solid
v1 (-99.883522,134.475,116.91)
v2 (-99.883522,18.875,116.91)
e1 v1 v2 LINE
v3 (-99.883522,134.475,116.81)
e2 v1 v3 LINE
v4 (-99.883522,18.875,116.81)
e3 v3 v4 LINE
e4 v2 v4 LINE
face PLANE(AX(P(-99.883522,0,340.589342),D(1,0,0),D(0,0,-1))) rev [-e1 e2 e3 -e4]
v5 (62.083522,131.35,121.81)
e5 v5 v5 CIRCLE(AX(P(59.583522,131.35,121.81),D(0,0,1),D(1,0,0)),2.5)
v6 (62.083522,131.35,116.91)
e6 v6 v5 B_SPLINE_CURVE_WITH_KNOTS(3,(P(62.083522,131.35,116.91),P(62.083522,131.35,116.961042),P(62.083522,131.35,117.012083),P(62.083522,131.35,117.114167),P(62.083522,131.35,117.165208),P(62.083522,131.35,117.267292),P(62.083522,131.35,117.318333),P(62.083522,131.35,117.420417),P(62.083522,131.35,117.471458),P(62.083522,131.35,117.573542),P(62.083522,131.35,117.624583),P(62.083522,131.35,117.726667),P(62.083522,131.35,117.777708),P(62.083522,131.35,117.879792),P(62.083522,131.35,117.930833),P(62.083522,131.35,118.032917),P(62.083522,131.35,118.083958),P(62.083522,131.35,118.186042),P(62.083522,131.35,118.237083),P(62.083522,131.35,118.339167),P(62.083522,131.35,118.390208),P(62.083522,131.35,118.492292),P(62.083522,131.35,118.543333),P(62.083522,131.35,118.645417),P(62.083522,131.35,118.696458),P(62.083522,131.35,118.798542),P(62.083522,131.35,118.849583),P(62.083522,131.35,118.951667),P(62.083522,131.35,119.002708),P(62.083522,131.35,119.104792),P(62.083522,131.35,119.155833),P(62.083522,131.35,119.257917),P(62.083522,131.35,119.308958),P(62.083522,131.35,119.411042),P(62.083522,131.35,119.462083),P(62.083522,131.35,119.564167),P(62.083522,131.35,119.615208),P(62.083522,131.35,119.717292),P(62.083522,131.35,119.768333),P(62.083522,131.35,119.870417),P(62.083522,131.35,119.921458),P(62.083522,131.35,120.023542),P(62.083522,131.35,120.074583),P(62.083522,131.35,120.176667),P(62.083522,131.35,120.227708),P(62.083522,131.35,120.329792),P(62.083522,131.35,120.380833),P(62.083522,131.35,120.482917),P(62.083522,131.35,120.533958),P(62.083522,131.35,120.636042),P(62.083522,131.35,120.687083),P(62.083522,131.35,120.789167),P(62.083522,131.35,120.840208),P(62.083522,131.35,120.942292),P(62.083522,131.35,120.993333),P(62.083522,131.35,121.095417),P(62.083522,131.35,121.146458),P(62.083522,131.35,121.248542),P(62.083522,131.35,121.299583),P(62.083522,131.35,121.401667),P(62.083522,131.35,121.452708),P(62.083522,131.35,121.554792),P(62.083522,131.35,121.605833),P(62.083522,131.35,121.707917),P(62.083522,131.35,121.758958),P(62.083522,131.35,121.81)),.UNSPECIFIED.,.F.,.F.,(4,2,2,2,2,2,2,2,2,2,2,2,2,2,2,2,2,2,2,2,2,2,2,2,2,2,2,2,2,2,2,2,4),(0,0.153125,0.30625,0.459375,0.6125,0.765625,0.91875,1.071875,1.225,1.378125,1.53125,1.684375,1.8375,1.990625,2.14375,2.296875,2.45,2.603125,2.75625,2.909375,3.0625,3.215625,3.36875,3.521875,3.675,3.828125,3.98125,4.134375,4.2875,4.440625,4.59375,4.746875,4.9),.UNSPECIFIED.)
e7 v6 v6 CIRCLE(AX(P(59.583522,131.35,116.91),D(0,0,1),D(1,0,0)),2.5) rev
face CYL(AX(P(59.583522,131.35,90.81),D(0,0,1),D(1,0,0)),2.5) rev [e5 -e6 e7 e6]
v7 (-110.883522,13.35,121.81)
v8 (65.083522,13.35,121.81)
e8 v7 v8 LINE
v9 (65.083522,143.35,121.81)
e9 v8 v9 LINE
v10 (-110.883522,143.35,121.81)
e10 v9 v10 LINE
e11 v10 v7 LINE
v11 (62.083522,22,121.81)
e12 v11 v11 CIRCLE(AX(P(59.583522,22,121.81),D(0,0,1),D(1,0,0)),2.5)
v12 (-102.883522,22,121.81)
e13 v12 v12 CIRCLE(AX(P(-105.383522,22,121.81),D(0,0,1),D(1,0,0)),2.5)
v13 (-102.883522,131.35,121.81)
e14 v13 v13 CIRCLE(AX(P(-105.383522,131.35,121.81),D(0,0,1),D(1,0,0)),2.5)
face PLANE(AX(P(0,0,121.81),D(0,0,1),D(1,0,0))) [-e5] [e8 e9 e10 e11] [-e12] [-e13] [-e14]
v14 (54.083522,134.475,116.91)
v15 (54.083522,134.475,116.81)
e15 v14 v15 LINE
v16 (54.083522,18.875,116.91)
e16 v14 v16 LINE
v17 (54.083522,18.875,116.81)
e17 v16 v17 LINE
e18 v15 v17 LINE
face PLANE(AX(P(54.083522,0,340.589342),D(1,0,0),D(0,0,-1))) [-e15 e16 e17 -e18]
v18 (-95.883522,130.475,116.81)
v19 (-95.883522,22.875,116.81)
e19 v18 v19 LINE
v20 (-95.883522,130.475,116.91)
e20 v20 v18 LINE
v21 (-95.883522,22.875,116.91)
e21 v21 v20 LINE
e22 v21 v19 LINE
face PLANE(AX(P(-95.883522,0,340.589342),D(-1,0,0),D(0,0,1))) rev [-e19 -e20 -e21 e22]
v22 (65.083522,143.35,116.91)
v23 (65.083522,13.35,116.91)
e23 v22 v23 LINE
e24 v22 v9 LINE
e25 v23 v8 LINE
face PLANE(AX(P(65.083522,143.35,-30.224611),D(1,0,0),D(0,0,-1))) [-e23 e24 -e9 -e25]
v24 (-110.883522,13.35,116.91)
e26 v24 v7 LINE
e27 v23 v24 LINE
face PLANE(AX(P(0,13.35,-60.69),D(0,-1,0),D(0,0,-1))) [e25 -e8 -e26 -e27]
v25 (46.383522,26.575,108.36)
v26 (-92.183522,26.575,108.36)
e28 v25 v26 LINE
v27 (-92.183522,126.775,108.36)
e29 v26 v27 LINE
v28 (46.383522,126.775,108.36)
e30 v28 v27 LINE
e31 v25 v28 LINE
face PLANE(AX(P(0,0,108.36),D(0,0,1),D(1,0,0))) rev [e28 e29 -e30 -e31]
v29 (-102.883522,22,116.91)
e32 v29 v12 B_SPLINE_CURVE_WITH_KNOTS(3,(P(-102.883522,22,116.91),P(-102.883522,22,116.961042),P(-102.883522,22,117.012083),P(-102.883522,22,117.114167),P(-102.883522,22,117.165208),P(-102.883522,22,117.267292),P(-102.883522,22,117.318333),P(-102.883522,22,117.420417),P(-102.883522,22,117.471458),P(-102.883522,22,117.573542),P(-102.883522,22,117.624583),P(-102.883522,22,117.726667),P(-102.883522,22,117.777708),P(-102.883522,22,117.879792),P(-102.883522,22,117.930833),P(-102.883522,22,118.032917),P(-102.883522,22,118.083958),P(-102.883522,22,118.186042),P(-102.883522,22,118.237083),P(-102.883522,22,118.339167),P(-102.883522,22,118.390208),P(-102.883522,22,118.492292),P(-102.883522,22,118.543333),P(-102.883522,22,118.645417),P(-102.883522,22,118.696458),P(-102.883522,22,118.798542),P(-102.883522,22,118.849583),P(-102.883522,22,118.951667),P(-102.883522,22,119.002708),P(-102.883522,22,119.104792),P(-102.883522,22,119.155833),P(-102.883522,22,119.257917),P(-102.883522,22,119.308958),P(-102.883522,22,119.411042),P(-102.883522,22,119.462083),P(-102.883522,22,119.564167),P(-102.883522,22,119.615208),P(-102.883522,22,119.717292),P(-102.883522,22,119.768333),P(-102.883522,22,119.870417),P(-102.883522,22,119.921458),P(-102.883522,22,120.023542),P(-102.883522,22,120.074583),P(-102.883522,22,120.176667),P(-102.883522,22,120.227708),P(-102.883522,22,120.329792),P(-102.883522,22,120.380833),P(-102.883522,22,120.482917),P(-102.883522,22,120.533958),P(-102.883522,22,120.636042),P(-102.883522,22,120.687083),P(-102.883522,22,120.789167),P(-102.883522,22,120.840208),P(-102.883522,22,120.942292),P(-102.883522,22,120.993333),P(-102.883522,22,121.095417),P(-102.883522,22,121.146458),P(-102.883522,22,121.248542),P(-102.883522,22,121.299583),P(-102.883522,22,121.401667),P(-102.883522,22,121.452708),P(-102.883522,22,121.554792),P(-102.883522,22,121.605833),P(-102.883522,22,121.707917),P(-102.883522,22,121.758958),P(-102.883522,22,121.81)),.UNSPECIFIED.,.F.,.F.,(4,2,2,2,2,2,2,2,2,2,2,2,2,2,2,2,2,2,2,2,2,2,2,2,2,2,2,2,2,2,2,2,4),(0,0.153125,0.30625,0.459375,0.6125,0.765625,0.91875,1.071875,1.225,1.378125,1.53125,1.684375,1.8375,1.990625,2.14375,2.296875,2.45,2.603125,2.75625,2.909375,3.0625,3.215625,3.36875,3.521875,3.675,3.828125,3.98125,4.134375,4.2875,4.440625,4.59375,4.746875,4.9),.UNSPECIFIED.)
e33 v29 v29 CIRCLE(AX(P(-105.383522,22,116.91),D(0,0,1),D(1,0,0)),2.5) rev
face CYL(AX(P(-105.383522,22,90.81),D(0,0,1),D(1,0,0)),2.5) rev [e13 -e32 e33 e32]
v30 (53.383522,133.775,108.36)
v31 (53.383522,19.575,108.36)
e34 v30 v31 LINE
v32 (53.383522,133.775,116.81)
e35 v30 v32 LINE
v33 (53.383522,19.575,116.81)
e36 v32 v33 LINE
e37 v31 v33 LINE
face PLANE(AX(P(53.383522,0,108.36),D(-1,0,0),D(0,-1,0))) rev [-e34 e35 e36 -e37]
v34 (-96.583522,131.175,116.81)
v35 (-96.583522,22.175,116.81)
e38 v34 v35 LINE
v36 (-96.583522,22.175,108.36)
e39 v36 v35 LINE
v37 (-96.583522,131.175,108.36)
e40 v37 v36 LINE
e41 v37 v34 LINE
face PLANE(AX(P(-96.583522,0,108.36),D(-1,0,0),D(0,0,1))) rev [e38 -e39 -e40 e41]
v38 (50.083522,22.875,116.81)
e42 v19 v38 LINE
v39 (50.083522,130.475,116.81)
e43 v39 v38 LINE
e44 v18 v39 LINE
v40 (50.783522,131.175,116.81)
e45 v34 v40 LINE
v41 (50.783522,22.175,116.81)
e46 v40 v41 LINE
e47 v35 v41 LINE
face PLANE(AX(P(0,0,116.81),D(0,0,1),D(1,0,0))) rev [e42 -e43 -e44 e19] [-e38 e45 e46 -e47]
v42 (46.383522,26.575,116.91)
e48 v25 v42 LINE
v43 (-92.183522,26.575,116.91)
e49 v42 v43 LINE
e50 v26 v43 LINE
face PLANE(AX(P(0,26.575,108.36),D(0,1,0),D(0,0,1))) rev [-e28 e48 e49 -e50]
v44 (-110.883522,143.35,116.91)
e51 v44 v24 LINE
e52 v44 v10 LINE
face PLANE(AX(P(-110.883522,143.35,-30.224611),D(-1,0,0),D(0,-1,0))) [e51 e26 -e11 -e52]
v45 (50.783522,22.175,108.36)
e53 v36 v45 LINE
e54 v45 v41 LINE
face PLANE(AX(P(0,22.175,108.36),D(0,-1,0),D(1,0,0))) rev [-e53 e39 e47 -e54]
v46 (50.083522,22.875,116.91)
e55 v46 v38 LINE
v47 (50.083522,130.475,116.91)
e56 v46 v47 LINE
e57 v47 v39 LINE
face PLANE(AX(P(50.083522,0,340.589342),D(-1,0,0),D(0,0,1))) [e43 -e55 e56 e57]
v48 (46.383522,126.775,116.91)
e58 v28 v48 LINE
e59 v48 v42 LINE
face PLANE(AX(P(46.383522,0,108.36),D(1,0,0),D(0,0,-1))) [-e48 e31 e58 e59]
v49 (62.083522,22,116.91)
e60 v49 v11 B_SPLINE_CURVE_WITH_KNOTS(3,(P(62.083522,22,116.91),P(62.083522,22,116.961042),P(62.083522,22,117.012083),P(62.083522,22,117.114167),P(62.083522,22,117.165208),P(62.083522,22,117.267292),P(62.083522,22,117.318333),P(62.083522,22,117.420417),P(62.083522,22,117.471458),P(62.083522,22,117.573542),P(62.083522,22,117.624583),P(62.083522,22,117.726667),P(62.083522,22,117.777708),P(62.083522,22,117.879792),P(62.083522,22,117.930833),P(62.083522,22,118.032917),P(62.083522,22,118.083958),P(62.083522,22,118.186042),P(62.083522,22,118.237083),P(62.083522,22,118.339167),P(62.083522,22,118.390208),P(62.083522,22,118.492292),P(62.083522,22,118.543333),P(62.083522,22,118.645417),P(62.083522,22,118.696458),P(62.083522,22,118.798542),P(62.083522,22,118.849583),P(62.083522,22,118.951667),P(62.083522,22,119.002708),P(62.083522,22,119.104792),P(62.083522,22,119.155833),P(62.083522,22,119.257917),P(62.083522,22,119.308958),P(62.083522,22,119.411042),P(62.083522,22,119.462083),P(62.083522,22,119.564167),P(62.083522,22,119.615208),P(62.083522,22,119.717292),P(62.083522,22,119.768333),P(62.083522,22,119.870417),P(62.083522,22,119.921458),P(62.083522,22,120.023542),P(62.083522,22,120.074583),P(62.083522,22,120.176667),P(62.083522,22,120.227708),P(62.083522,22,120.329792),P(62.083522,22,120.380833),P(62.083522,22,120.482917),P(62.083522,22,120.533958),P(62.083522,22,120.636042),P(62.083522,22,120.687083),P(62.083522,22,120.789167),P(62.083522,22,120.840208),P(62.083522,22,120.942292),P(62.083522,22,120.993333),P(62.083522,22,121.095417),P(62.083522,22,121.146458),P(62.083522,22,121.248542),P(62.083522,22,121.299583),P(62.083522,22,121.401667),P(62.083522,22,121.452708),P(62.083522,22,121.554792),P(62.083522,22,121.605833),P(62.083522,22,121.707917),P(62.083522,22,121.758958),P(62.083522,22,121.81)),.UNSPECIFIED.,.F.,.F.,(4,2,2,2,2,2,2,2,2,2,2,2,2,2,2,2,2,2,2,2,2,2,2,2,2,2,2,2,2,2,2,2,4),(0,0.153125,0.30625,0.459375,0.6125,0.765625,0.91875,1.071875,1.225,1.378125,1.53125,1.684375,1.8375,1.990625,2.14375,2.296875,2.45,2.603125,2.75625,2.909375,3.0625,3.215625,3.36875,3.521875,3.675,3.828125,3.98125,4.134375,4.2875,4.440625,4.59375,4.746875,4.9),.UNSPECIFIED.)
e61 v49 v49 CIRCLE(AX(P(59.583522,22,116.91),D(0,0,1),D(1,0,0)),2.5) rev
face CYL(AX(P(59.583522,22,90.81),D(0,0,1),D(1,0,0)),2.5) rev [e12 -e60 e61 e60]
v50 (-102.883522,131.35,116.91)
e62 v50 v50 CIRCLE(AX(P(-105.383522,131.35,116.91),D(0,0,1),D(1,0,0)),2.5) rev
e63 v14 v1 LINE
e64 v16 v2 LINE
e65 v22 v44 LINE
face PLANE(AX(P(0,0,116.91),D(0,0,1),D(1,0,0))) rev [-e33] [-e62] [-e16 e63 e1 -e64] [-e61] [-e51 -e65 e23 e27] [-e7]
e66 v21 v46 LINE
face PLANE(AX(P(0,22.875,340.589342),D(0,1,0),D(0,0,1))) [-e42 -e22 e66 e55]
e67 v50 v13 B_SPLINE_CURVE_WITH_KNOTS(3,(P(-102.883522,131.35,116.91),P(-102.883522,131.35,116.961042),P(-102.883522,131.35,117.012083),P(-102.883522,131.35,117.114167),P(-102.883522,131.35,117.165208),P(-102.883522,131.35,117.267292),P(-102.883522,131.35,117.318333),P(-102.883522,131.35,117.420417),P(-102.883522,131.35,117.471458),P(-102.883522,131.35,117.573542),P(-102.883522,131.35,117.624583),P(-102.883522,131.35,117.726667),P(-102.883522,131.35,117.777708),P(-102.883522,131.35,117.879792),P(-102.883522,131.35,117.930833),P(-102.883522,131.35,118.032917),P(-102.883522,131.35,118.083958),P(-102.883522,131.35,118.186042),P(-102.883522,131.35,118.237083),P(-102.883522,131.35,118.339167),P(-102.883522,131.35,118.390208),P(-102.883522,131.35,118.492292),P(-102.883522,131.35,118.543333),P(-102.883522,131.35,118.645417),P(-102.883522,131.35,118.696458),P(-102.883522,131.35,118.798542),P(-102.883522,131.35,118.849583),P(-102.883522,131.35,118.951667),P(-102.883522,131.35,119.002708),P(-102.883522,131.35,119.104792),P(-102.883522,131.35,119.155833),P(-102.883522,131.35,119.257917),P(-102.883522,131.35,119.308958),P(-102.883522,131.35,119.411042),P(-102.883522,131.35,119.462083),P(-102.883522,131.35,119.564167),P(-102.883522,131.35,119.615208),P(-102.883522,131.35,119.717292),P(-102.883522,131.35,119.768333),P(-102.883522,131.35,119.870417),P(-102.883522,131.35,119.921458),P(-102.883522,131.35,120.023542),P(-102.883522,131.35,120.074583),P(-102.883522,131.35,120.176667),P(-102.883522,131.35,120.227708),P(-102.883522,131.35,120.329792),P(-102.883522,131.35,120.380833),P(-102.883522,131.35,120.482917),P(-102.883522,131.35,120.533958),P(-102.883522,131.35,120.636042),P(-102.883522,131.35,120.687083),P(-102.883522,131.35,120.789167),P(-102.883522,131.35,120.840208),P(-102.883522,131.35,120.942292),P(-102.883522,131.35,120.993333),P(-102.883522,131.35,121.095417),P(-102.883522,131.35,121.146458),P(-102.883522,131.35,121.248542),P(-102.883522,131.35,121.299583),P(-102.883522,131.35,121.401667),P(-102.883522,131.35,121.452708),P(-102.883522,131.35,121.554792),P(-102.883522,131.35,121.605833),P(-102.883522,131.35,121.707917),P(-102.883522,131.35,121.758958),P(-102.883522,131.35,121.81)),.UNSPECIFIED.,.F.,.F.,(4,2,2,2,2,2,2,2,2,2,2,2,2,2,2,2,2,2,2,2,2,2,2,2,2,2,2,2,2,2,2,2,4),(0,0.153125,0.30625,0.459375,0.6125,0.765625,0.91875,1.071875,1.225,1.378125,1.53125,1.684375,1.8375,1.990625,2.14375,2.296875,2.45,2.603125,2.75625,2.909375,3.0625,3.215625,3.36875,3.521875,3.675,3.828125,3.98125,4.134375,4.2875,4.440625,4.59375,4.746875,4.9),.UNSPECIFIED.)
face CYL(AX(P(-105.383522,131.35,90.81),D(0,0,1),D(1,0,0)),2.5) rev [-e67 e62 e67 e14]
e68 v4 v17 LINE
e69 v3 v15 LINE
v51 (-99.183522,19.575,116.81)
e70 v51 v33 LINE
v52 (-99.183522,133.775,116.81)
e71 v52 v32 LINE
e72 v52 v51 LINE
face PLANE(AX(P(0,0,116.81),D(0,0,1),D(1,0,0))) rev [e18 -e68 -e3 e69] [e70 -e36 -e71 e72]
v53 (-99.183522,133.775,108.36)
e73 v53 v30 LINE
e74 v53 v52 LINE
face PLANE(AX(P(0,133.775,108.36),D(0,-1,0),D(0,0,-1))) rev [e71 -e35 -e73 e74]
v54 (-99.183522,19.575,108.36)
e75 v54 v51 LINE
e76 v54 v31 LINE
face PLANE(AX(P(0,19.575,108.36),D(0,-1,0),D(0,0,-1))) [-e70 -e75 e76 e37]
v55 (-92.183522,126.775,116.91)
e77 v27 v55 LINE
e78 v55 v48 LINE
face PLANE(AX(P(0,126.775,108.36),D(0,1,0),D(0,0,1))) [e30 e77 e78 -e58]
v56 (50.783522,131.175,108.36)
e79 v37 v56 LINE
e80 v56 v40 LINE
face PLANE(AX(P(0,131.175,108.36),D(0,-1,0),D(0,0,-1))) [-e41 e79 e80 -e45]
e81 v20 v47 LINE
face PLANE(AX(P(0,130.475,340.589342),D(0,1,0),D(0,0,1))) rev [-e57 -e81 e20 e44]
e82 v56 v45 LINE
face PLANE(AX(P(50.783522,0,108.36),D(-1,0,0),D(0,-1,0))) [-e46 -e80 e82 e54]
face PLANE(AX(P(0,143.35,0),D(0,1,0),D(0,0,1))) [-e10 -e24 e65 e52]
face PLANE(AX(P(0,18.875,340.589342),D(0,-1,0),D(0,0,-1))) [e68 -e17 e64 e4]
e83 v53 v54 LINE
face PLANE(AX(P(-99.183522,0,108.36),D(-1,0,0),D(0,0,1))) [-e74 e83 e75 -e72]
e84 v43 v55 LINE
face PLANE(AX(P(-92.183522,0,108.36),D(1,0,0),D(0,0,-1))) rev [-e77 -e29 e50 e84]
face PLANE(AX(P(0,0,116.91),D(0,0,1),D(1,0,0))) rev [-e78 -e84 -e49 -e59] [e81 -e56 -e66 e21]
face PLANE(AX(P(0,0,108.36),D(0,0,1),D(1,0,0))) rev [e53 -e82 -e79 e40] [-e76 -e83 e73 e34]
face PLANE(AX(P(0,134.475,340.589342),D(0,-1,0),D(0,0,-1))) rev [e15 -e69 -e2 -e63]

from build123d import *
from OCP.BRepFilletAPI import BRepFilletAPI_MakeChamfer

# Parameters (mm, degrees)
SKETCH1_R               = 172.5
BOSS_EXTRUDE1_DEPTH     = 10
SKETCH2_R               = 48.41
CUT_EXTRUDE1_DEPTH      = 10
BOSS_EXTRUDE2_DEPTH     = 5
CUT_EXTRUDE2_DEPTH      = 497
CUT_EXTRUDE6_START      = -497
CUT_EXTRUDE6_DEPTH      = 497
SKETCH6_W               = 195.767044214
SKETCH6_H               = 55
SKETCH6_W_2             = 185.767044214
SKETCH6_H_2             = 45
BOSS_EXTRUDE3_DEPTH     = 133.35
SKETCH7_W               = 185.767044214
SKETCH7_H               = 45
BOSS_EXTRUDE4_DEPTH     = 5
BOSS_EXTRUDE5_DEPTH     = 8
CHAMFER1_SIZE           = 8
CHAMFER1_SIZE2          = 6.250285012
CHAMFER1_PART_2_SIZE    = 8
CHAMFER1_PART_2_SIZE2   = 6.250285012
CHAMFER1_PART_3_SIZE    = 8
CHAMFER1_PART_3_SIZE2   = 6.250285012
FILLET1_R               = 38
SKETCH9_R               = 374.079334695
CUT_EXTRUDE7_DEPTH      = 93
CUT_EXTRUDE8_DEPTH      = 93
CUT_EXTRUDE8_DEPTH_BACK = 93
SKETCH10_R              = 229.38613092
SKETCH10_R_2            = 152.4
SKETCH11_W              = 291.443368419
SKETCH11_H              = 134.798764099
SKETCH11_W_2            = 144.967044214
SKETCH11_H_2            = 55
CUT_EXTRUDE9_DEPTH      = 143
SKETCH12_W              = 5
SKETCH12_H              = 55
BOSS_EXTRUDE6_DEPTH     = 133.35
SKETCH13_R              = 10
CUT_EXTRUDE10_DEPTH     = 58
SKETCH14_W              = 139.967044214
SKETCH14_H              = 45
BOSS_EXTRUDE7_DEPTH     = 5
SKETCH15_W              = 139.967044214
SKETCH15_H              = 123.35
CUT_EXTRUDE11_DEPTH     = 13
SKETCH16_W              = 10
SKETCH16_H              = 133.35
SKETCH16_W_2            = 149.967044214
BOSS_EXTRUDE9_DEPTH     = 17
SKETCH17_W              = 153.967044214
SKETCH17_H              = 115.6
SKETCH17_W_2            = 145.967044214
SKETCH17_H_2            = 107.6
CUT_EXTRUDE12_DEPTH     = 10
CHAMFER2_SIZE           = 10
CHAMFER2_SIZE2          = 5.773502692
SKETCH24_R              = 15
CUT_EXTRUDE16_DEPTH     = 177.5
SKETCH20_W              = 169.967044214
SKETCH20_H              = 3.35
CUT_EXTRUDE17_DEPTH     = 177.5
SKETCH25_W              = 139.967044214
SKETCH25_H              = 38.773502692
BOSS_EXTRUDE11_DEPTH    = 5
SKETCH26_W              = 3
SKETCH26_H              = 130
BOSS_EXTRUDE12_DEPTH    = 17
SKETCH18_R              = 2.5
CUT_EXTRUDE19_DEPTH     = 26
SKETCH27_W              = 152.567044214
SKETCH27_H              = 114.2
SKETCH27_W_2            = 147.367044214
SKETCH27_H_2            = 109
BOSS_EXTRUDE13_DEPTH    = 8.45
SKETCH27_W_3            = 138.567044214
SKETCH27_H_3            = 100.2
BOSS_EXTRUDE13_2_DEPTH  = 8.45
BOSS_EXTRUDE14_START    = 5
SKETCH28_W              = 175.967044214
SKETCH28_H              = 130
SKETCH28_R              = 2.5
BOSS_EXTRUDE14_DEPTH    = 5
SKETCH29_W              = 292.528596907
SKETCH29_H              = 171.315367969
CUT_EXTRUDE20_DEPTH     = 46.55
SKETCH30_W              = 175.967044214
SKETCH30_H              = 130
SKETCH30_W_2            = 153.967044214
SKETCH30_H_2            = 115.6
SKETCH30_W_3            = 145.967044214
SKETCH30_H_3            = 107.6
SKETCH30_W_4            = 138.567044214
SKETCH30_H_4            = 100.2
CUT_EXTRUDE23_DEPTH     = 8.55


with BuildPart() as part:
    # Sketch1 → Boss-Extrude1 (new body)
    with BuildSketch(Plane(origin=(0, 0, 0), x_dir=(1, 0, 0), z_dir=(0, 1, 0))):
        with Locations(Location((0, 0, 0), (0, 0, 270))):
            Circle(SKETCH1_R)
    extrude(amount=BOSS_EXTRUDE1_DEPTH)

    # Sketch2 → Cut-Extrude1 (cut)
    with BuildSketch(Plane(origin=(0, 10, 0), x_dir=(1, 0, 0), z_dir=(0, 1, 0))):
        with Locations((-75.91, -178.72)):
            Circle(SKETCH2_R)
        with Locations((75.91, -178.72)):
            Circle(SKETCH2_R)
    extrude(amount=-CUT_EXTRUDE1_DEPTH, mode=Mode.SUBTRACT)

    # Sketch3 → Boss-Extrude2 (add)
    with BuildSketch(Plane(origin=(0, 10, 0), x_dir=(1, 0, 0), z_dir=(0, 1, 0))):
        with BuildLine():
            Line((-98.968297449, -119.81), (98.968297449, -119.81))
            ThreePointArc((98.968297449, -119.81), (0, 155.4), (-98.968297449, -119.81))
        make_face()
        with BuildLine():
            ThreePointArc((97.883522107, -116.81), (0, 152.4), (-97.883522107, -116.81))
            Line((-97.883522107, -116.81), (97.883522107, -116.81))
        make_face(mode=Mode.SUBTRACT)
    extrude(amount=BOSS_EXTRUDE2_DEPTH)

    # Sketch4 → Cut-Extrude2 (cut)
    with BuildSketch(Plane(origin=(0, 10, 0), x_dir=(1, 0, 0), z_dir=(0, 1, 0))):
        Polygon((-28.261160255, -170.169200565), (28.261160255, -170.169200565), (28.261160255, -183.836149753), (-30.300470404, -183.836149753), align=None)
    extrude(amount=-CUT_EXTRUDE2_DEPTH, mode=Mode.SUBTRACT)

    # Sketch5 → Cut-Extrude6 (cut)
    with BuildSketch(Plane(origin=(0, 10, 0), x_dir=(1, 0, 0), z_dir=(0, 1, 0)).offset(CUT_EXTRUDE6_START)):
        with BuildLine():
            ThreePointArc((26.702080818, 170.420799435), (0, 172.5), (-26.702080818, 170.420799435))
            Line((-26.702080818, 170.420799435), (26.702080818, 170.420799435))
        make_face()
        with BuildLine():
            ThreePointArc((166.525, -45.007492432), (172.5, 0), (166.525, 45.007492432))
            Line((166.525, 45.007492432), (166.525, -45.007492432))
        make_face()
        with BuildLine():
            Line((-166.525, -45.007492432), (-166.525, 45.007492432))
            ThreePointArc((-166.525, 45.007492432), (-172.5, 0), (-166.525, -45.007492432))
        make_face()
    extrude(amount=CUT_EXTRUDE6_DEPTH, mode=Mode.SUBTRACT)

    # Sketch6 → Boss-Extrude3 (add)
    with BuildSketch(Plane(origin=(0, 10, 0), x_dir=(1, 0, 0), z_dir=(0, 1, 0))):
        with Locations((0, -89.31)):
            Rectangle(SKETCH6_W, SKETCH6_H)
        with Locations((0, -89.31)):
            Rectangle(SKETCH6_W_2, SKETCH6_H_2, mode=Mode.SUBTRACT)
    extrude(amount=BOSS_EXTRUDE3_DEPTH)

    # Sketch7 → Boss-Extrude4 (add)
    with BuildSketch(Plane(origin=(0, 10, 0), x_dir=(1, 0, 0), z_dir=(0, 1, 0))):
        with Locations((0, -89.31)):
            Rectangle(SKETCH7_W, SKETCH7_H)
    extrude(amount=BOSS_EXTRUDE4_DEPTH)

    # Sketch8 → Boss-Extrude5 (add)
    with BuildSketch(Plane(origin=(0, 10, 0), x_dir=(1, 0, 0), z_dir=(0, 1, 0))):
        with BuildLine():
            Line((-97.883522107, -61.81), (-112.883522107, -61.81))
            Line((-112.883522107, -61.81), (-112.883522107, -101.267136509))
            ThreePointArc((-112.883522107, -101.267136509), (-105.634768892, -108.807252061), (-97.883522107, -115.829782871))
            Line((-97.883522107, -115.829782871), (-97.883522107, -61.81))
        make_face()
        with BuildLine():
            Line((-88.028513968, -46.81), (-88.028513968, -61.81))
            Line((-88.028513968, -61.81), (97.883522107, -61.81))
            Line((97.883522107, -61.81), (97.883522107, -115.829782871))
            ThreePointArc((97.883522107, -115.829782871), (105.634768892, -108.807252061), (112.883522107, -101.267136509))
            Line((112.883522107, -101.267136509), (112.883522107, -46.81))
            Line((112.883522107, -46.81), (-88.028513968, -46.81))
        make_face()
    extrude(amount=BOSS_EXTRUDE5_DEPTH)

    # Chamfer1
    chamfer1_edges = [part.edges().sort_by_distance(p)[0] for p in [
        (-97.883522107, 18, 88.819891436),
    ]]
    chamfer1_side = [part.faces().sort_by_distance(p)[0] for p in [
        (-97.883522107, 80.599247918, 89.340686997),
    ]]
    chamfer(chamfer1_edges, length=CHAMFER1_SIZE, length2=CHAMFER1_SIZE2, reference=chamfer1_side[0])

    # Chamfer1 part 2
    chamfer1_part_2_edges = [part.edges().sort_by_distance(p)[0] for p in [
        (4.927504069, 18, 61.81),
    ]]
    chamfer1_part_2_side = [part.faces().sort_by_distance(p)[0] for p in [
        (-0.807441513, 80.139082253, 61.81),
    ]]
    chamfer(chamfer1_part_2_edges, length=CHAMFER1_PART_2_SIZE, length2=CHAMFER1_PART_2_SIZE2, reference=chamfer1_part_2_side[0])

    # Chamfer1 part 3
    chamfer1_part_3_edges = [part.edges().sort_by_distance(p)[0] for p in [
        (97.883522107, 18, 88.819891436),
    ]]
    chamfer1_part_3_side = [part.faces().sort_by_distance(p)[0] for p in [
        (97.883522107, 80.599247918, 89.340686997),
    ]]
    chamfer(chamfer1_part_3_edges, length=CHAMFER1_PART_3_SIZE, length2=CHAMFER1_PART_3_SIZE2, reference=chamfer1_part_3_side[0])

    # Fillet1
    # the kernel refuses this fillet: 38 mm, written as the material it adds along each edge
    with BuildSketch(Plane(origin=(-97.883522107, 26, 148.028657271), x_dir=(-0.61566147532566, -0.7880107536067207, 0), z_dir=(0, 0, -1))) as fillet1_piece_1_section:
        with BuildLine():
            CenterArc((13.24591235, 37.873851244), FILLET1_R, 232, 33.330100487)
            Line((-10.149223713, 7.929442607), (0, 0))
            Line((0, 0), (10.152145721, 0))
        make_face()
    fillet1_piece_1 = extrude(amount=86.218657271, mode=Mode.PRIVATE)
    fillet1_piece_1 = fillet1_piece_1 & Plane(origin=(0, 26, 0), x_dir=(-0.7443687577094257, 0, 0.6677687867414337), z_dir=(0, -1, 0)) * Cylinder(151.65, 214, mode=Mode.PRIVATE)
    add(fillet1_piece_1)
    with BuildSketch(Plane(origin=(-88.028513968, 26, 61.81), x_dir=(0, 1, 0), z_dir=(1, 0, 0))) as fillet1_piece_2_section:
        with BuildLine():
            CenterArc((12.87954976, -38), FILLET1_R, 90, 33.330100487)
            Line((-8, -6.250285012), (0, 0))
            Line((0, 0), (12.87954976, 0))
        make_face()
    fillet1_piece_2 = extrude(amount=218.110910475, mode=Mode.PRIVATE)
    fillet1_piece_2 = fillet1_piece_2 - Plane(origin=(135.883522107, 38.87954976, 61.81), x_dir=(-0.8355188154722692, -0.5494618357919104, 0), z_dir=(0, 0, -1)) * Cylinder(38, 488, mode=Mode.PRIVATE)
    add(fillet1_piece_2)
    with BuildSketch(Plane(origin=(97.883522107, 26, 29.6111256), x_dir=(0.61566147532566, -0.7880107536067207, 0), z_dir=(0, 0, 1))) as fillet1_piece_3_section:
        with BuildLine():
            CenterArc((13.24591235, 37.873851244), FILLET1_R, 232, 33.330100487)
            Line((-10.149223713, 7.929442607), (0, 0))
            Line((0, 0), (10.152145721, 0))
        make_face()
    fillet1_piece_3 = extrude(amount=118.417531672, mode=Mode.PRIVATE)
    fillet1_piece_3 = fillet1_piece_3 & Plane(origin=(0, 26, 0), x_dir=(0.6454567893612635, 0, 0.7637967878090673), z_dir=(0, -1, 0)) * Cylinder(151.65, 278, mode=Mode.PRIVATE)
    fillet1_piece_3 = fillet1_piece_3 - Plane(origin=(97.883522107, 38.87954976, 23.81), x_dir=(0, 0, 1), z_dir=(-1, 0, 0)) * Cylinder(38, 278, mode=Mode.PRIVATE)
    add(fillet1_piece_3)

    # Sketch9 → Cut-Extrude7 (cut)
    with BuildSketch(Plane(origin=(0, 10, 0), x_dir=(1, 0, 0), z_dir=(0, 1, 0))):
        Circle(SKETCH9_R)
    extrude(amount=-CUT_EXTRUDE7_DEPTH, mode=Mode.SUBTRACT)

    # Sketch10 → Cut-Extrude8 (cut, two sides: drawn at the far end of the back side and taken through both)
    with BuildSketch(Plane.XZ.offset(-10).offset(-CUT_EXTRUDE8_DEPTH_BACK)):
        Circle(SKETCH10_R)
        Circle(SKETCH10_R_2, mode=Mode.SUBTRACT)
    extrude(amount=CUT_EXTRUDE8_DEPTH + CUT_EXTRUDE8_DEPTH_BACK, mode=Mode.SUBTRACT)

    # Sketch11 → Cut-Extrude9 (cut)
    with BuildSketch(Plane(origin=(0, 143.35, 0), x_dir=(1, 0, 0), z_dir=(0, 1, 0))):
        with Locations((4.840839595, -88.771460056)):
            Rectangle(SKETCH11_W, SKETCH11_H)
        with Locations((-25.4, -89.31)):
            Rectangle(SKETCH11_W_2, SKETCH11_H_2, mode=Mode.SUBTRACT)
    extrude(amount=-CUT_EXTRUDE9_DEPTH, mode=Mode.SUBTRACT)

    # Sketch12 → Boss-Extrude6 (add)
    with BuildSketch(Plane(origin=(0, 143.35, 0), x_dir=(1, 0, 0), z_dir=(0, 1, 0))):
        with Locations((49.583522107, -89.31)):
            Rectangle(SKETCH12_W, SKETCH12_H)
    extrude(amount=-BOSS_EXTRUDE6_DEPTH)

    # Sketch13 → Cut-Extrude10 (cut)
    with BuildSketch(Plane.ZY.offset(97.883522107)):
        with Locations((89.418847681, 75)):
            Circle(SKETCH13_R)
    extrude(amount=-CUT_EXTRUDE10_DEPTH, mode=Mode.SUBTRACT)

    # Sketch14 → Boss-Extrude7 (add)
    with BuildSketch(Plane(origin=(0, 143.35, 0), x_dir=(1, 0, 0), z_dir=(0, 1, 0))):
        with Locations((-22.9, -89.31)):
            Rectangle(SKETCH14_W, SKETCH14_H)
    extrude(amount=-BOSS_EXTRUDE7_DEPTH)

    # Sketch15 → Cut-Extrude11 (cut)
    with BuildSketch(Plane.XY.offset(116.81)):
        with Locations((-22.9, 76.675)):
            Rectangle(SKETCH15_W, SKETCH15_H)
    extrude(amount=-CUT_EXTRUDE11_DEPTH, mode=Mode.SUBTRACT)

    # Sketch16 → Boss-Extrude9 (add)
    # profile 1 of 5: a face of its own
    with BuildSketch(Plane.XY.offset(116.81)):
        with Locations((-102.883522107, 76.675)):
            Rectangle(SKETCH16_W, SKETCH16_H)
    # profile 2 of 5: a face of its own
    with BuildSketch(Plane.XY.offset(116.81)):
        with Locations((-22.9, 76.675)):
            Rectangle(SKETCH16_W_2, SKETCH16_H)
        Polygon((-92.883522107, 127.475), (-92.883522107, 138.35), (47.083522107, 138.35), (47.083522107, 127.475), (47.083522107, 76.675), (47.083522107, 25.875), (47.083522107, 15), (-92.883522107, 15), (-92.883522107, 25.875), (-92.883522107, 76.675), align=None, mode=Mode.SUBTRACT)
    # profile 3 of 5: a face of its own
    with BuildSketch(Plane.XY.offset(116.81)):
        with Locations((57.083522107, 76.675)):
            Rectangle(SKETCH16_W, SKETCH16_H)
    # profile 4 of 5: a face of its own
    with BuildSketch(Plane.XY.offset(116.81)):
        Polygon((47.083522107, 138.35), (-92.883522107, 138.35), (-92.883522107, 127.475), (-22.9, 127.475), (47.083522107, 127.475), align=None)
    # profile 5 of 5: a face of its own
    with BuildSketch(Plane.XY.offset(116.81)):
        Polygon((-22.9, 25.875), (-92.883522107, 25.875), (-92.883522107, 15), (47.083522107, 15), (47.083522107, 25.875), align=None)
    extrude(amount=-BOSS_EXTRUDE9_DEPTH)

    # Sketch17 → Cut-Extrude12 (cut)
    with BuildSketch(Plane.XY.offset(116.81)):
        with Locations((-22.9, 76.675)):
            Rectangle(SKETCH17_W, SKETCH17_H)
        with Locations((-22.9, 76.675)):
            Rectangle(SKETCH17_W_2, SKETCH17_H_2, mode=Mode.SUBTRACT)
    extrude(amount=-CUT_EXTRUDE12_DEPTH, mode=Mode.SUBTRACT)

    # Chamfer2: one chamfer whose edges measure the first distance from different faces: ONE call of the kernel's chamfer builder (chamfer() names one face for all edges)
    chamfer2_edges_1 = [part.edges().sort_by_distance(p)[0] for p in [
        (-22.9, 25.875, 99.81),
    ]]
    chamfer2_side_1 = [part.faces().sort_by_distance(p)[0] for p in [
        (-22.9, 25.875, 108.31),
    ]]
    chamfer2_edges_2 = [part.edges().sort_by_distance(p)[0] for p in [
        (-22.9, 127.475, 99.81),
    ]]
    chamfer2_side_2 = [part.faces().sort_by_distance(p)[0] for p in [
        (-22.9, 132.9125, 99.81),
    ]]
    chamfer2 = BRepFilletAPI_MakeChamfer(part.part.solid().wrapped)
    for e in chamfer2_edges_1:
        chamfer2.Add(CHAMFER2_SIZE, CHAMFER2_SIZE2, e.wrapped, chamfer2_side_1[0].wrapped)  # the first distance lies on this face
    for e in chamfer2_edges_2:
        chamfer2.Add(CHAMFER2_SIZE, CHAMFER2_SIZE2, e.wrapped, chamfer2_side_2[0].wrapped)  # the first distance lies on this face
    add(Compound.cast(chamfer2.Shape()), mode=Mode.REPLACE)

    # Sketch24 → Cut-Extrude16 (cut)
    with BuildSketch(Plane.ZY.offset(97.883522107)):
        with Locations((83.81, 75)):
            Circle(SKETCH24_R)
    extrude(amount=-CUT_EXTRUDE16_DEPTH, mode=Mode.SUBTRACT)

    # Sketch20 → Cut-Extrude17 (cut)
    with BuildSketch(Plane.XY.offset(116.81)):
        with Locations((-22.9, 11.675)):
            Rectangle(SKETCH20_W, SKETCH20_H)
    extrude(amount=-CUT_EXTRUDE17_DEPTH, mode=Mode.SUBTRACT)

    # Sketch25 → Boss-Extrude11 (add)
    with BuildSketch(Plane(origin=(0, 13.35, 0), x_dir=(-1, 0, 0), z_dir=(0, -1, 0))):
        with Locations((22.9, -86.196751346)):
            Rectangle(SKETCH25_W, SKETCH25_H)
    extrude(amount=-BOSS_EXTRUDE11_DEPTH)

    # Sketch26 → Boss-Extrude12 (add)
    with BuildSketch(Plane.XY.offset(116.81)):
        with Locations((-109.383522107, 78.35)):
            Rectangle(SKETCH26_W, SKETCH26_H)
        with Locations((63.583522107, 78.35)):
            Rectangle(SKETCH26_W, SKETCH26_H)
    extrude(amount=-BOSS_EXTRUDE12_DEPTH)

    # Sketch18 → Cut-Extrude19 (cut)
    with BuildSketch(Plane.XY.offset(116.81)):
        with Locations((-105.383522107, 22)):
            Circle(SKETCH18_R)
        with Locations((59.583522107, 22)):
            Circle(SKETCH18_R)
        with Locations((59.583522107, 131.35)):
            Circle(SKETCH18_R)
        with Locations((-105.383522107, 131.35)):
            Circle(SKETCH18_R)
    extrude(amount=-CUT_EXTRUDE19_DEPTH, mode=Mode.SUBTRACT)



with BuildPart() as body_2:
    # Sketch27 → Boss-Extrude13 (new body)
    with BuildSketch(Plane.XY.offset(116.81)):
        with Locations((-22.9, 76.675)):
            Rectangle(SKETCH27_W, SKETCH27_H)
        with Locations((-22.9, 76.675)):
            Rectangle(SKETCH27_W_2, SKETCH27_H_2, mode=Mode.SUBTRACT)
    extrude(amount=-BOSS_EXTRUDE13_DEPTH)


with BuildPart() as body_3:
    # Sketch27 → Boss-Extrude13 2 (new body)
    with BuildSketch(Plane.XY.offset(116.81)):
        with Locations((-22.9, 76.675)):
            Rectangle(SKETCH27_W_3, SKETCH27_H_3)
    extrude(amount=-BOSS_EXTRUDE13_2_DEPTH)


with BuildPart() as part_1:
    add(part.part)

    add(body_2.part)  # Boss-Extrude14 merges body 2

    add(body_3.part)  # Boss-Extrude14 merges body 3
    # Sketch28 → Boss-Extrude14 (add)
    with BuildSketch(Plane.XY.offset(116.81).offset(BOSS_EXTRUDE14_START)):
        with Locations((-22.9, 78.35)):
            Rectangle(SKETCH28_W, SKETCH28_H)
        with Locations((-105.383522107, 131.35)):
            Circle(SKETCH28_R, mode=Mode.SUBTRACT)
        with Locations((59.583522107, 131.35)):
            Circle(SKETCH28_R, mode=Mode.SUBTRACT)
        with Locations((59.583522107, 22)):
            Circle(SKETCH28_R, mode=Mode.SUBTRACT)
        with Locations((-105.383522107, 22)):
            Circle(SKETCH28_R, mode=Mode.SUBTRACT)
    extrude(amount=-BOSS_EXTRUDE14_DEPTH)

    # Sketch29 → Cut-Extrude20 (cut)
    with BuildSketch(Plane(origin=(0, 0, 61.81), x_dir=(-1, 0, 0), z_dir=(0, 0, -1))):
        with Locations((7.671703237, 74.887303123)):
            Rectangle(SKETCH29_W, SKETCH29_H)
    extrude(amount=-CUT_EXTRUDE20_DEPTH, mode=Mode.SUBTRACT)

    # Sketch30 → Cut-Extrude23 (cut)
    # profile 1 of 2: a face of its own
    with BuildSketch(Plane(origin=(0, 0, 108.36), x_dir=(-1, 0, 0), z_dir=(0, 0, -1))):
        with Locations((22.9, 78.35)):
            Rectangle(SKETCH30_W, SKETCH30_H)
        with Locations((22.9, 76.675)):
            Rectangle(SKETCH30_W_2, SKETCH30_H_2, mode=Mode.SUBTRACT)
    # profile 2 of 2: a face of its own
    with BuildSketch(Plane(origin=(0, 0, 108.36), x_dir=(-1, 0, 0), z_dir=(0, 0, -1))):
        with Locations((22.9, 76.675)):
            Rectangle(SKETCH30_W_3, SKETCH30_H_3)
        with Locations((22.9, 76.675)):
            Rectangle(SKETCH30_W_4, SKETCH30_H_4, mode=Mode.SUBTRACT)
    extrude(amount=-CUT_EXTRUDE23_DEPTH, mode=Mode.SUBTRACT)


solid = part_1.part
